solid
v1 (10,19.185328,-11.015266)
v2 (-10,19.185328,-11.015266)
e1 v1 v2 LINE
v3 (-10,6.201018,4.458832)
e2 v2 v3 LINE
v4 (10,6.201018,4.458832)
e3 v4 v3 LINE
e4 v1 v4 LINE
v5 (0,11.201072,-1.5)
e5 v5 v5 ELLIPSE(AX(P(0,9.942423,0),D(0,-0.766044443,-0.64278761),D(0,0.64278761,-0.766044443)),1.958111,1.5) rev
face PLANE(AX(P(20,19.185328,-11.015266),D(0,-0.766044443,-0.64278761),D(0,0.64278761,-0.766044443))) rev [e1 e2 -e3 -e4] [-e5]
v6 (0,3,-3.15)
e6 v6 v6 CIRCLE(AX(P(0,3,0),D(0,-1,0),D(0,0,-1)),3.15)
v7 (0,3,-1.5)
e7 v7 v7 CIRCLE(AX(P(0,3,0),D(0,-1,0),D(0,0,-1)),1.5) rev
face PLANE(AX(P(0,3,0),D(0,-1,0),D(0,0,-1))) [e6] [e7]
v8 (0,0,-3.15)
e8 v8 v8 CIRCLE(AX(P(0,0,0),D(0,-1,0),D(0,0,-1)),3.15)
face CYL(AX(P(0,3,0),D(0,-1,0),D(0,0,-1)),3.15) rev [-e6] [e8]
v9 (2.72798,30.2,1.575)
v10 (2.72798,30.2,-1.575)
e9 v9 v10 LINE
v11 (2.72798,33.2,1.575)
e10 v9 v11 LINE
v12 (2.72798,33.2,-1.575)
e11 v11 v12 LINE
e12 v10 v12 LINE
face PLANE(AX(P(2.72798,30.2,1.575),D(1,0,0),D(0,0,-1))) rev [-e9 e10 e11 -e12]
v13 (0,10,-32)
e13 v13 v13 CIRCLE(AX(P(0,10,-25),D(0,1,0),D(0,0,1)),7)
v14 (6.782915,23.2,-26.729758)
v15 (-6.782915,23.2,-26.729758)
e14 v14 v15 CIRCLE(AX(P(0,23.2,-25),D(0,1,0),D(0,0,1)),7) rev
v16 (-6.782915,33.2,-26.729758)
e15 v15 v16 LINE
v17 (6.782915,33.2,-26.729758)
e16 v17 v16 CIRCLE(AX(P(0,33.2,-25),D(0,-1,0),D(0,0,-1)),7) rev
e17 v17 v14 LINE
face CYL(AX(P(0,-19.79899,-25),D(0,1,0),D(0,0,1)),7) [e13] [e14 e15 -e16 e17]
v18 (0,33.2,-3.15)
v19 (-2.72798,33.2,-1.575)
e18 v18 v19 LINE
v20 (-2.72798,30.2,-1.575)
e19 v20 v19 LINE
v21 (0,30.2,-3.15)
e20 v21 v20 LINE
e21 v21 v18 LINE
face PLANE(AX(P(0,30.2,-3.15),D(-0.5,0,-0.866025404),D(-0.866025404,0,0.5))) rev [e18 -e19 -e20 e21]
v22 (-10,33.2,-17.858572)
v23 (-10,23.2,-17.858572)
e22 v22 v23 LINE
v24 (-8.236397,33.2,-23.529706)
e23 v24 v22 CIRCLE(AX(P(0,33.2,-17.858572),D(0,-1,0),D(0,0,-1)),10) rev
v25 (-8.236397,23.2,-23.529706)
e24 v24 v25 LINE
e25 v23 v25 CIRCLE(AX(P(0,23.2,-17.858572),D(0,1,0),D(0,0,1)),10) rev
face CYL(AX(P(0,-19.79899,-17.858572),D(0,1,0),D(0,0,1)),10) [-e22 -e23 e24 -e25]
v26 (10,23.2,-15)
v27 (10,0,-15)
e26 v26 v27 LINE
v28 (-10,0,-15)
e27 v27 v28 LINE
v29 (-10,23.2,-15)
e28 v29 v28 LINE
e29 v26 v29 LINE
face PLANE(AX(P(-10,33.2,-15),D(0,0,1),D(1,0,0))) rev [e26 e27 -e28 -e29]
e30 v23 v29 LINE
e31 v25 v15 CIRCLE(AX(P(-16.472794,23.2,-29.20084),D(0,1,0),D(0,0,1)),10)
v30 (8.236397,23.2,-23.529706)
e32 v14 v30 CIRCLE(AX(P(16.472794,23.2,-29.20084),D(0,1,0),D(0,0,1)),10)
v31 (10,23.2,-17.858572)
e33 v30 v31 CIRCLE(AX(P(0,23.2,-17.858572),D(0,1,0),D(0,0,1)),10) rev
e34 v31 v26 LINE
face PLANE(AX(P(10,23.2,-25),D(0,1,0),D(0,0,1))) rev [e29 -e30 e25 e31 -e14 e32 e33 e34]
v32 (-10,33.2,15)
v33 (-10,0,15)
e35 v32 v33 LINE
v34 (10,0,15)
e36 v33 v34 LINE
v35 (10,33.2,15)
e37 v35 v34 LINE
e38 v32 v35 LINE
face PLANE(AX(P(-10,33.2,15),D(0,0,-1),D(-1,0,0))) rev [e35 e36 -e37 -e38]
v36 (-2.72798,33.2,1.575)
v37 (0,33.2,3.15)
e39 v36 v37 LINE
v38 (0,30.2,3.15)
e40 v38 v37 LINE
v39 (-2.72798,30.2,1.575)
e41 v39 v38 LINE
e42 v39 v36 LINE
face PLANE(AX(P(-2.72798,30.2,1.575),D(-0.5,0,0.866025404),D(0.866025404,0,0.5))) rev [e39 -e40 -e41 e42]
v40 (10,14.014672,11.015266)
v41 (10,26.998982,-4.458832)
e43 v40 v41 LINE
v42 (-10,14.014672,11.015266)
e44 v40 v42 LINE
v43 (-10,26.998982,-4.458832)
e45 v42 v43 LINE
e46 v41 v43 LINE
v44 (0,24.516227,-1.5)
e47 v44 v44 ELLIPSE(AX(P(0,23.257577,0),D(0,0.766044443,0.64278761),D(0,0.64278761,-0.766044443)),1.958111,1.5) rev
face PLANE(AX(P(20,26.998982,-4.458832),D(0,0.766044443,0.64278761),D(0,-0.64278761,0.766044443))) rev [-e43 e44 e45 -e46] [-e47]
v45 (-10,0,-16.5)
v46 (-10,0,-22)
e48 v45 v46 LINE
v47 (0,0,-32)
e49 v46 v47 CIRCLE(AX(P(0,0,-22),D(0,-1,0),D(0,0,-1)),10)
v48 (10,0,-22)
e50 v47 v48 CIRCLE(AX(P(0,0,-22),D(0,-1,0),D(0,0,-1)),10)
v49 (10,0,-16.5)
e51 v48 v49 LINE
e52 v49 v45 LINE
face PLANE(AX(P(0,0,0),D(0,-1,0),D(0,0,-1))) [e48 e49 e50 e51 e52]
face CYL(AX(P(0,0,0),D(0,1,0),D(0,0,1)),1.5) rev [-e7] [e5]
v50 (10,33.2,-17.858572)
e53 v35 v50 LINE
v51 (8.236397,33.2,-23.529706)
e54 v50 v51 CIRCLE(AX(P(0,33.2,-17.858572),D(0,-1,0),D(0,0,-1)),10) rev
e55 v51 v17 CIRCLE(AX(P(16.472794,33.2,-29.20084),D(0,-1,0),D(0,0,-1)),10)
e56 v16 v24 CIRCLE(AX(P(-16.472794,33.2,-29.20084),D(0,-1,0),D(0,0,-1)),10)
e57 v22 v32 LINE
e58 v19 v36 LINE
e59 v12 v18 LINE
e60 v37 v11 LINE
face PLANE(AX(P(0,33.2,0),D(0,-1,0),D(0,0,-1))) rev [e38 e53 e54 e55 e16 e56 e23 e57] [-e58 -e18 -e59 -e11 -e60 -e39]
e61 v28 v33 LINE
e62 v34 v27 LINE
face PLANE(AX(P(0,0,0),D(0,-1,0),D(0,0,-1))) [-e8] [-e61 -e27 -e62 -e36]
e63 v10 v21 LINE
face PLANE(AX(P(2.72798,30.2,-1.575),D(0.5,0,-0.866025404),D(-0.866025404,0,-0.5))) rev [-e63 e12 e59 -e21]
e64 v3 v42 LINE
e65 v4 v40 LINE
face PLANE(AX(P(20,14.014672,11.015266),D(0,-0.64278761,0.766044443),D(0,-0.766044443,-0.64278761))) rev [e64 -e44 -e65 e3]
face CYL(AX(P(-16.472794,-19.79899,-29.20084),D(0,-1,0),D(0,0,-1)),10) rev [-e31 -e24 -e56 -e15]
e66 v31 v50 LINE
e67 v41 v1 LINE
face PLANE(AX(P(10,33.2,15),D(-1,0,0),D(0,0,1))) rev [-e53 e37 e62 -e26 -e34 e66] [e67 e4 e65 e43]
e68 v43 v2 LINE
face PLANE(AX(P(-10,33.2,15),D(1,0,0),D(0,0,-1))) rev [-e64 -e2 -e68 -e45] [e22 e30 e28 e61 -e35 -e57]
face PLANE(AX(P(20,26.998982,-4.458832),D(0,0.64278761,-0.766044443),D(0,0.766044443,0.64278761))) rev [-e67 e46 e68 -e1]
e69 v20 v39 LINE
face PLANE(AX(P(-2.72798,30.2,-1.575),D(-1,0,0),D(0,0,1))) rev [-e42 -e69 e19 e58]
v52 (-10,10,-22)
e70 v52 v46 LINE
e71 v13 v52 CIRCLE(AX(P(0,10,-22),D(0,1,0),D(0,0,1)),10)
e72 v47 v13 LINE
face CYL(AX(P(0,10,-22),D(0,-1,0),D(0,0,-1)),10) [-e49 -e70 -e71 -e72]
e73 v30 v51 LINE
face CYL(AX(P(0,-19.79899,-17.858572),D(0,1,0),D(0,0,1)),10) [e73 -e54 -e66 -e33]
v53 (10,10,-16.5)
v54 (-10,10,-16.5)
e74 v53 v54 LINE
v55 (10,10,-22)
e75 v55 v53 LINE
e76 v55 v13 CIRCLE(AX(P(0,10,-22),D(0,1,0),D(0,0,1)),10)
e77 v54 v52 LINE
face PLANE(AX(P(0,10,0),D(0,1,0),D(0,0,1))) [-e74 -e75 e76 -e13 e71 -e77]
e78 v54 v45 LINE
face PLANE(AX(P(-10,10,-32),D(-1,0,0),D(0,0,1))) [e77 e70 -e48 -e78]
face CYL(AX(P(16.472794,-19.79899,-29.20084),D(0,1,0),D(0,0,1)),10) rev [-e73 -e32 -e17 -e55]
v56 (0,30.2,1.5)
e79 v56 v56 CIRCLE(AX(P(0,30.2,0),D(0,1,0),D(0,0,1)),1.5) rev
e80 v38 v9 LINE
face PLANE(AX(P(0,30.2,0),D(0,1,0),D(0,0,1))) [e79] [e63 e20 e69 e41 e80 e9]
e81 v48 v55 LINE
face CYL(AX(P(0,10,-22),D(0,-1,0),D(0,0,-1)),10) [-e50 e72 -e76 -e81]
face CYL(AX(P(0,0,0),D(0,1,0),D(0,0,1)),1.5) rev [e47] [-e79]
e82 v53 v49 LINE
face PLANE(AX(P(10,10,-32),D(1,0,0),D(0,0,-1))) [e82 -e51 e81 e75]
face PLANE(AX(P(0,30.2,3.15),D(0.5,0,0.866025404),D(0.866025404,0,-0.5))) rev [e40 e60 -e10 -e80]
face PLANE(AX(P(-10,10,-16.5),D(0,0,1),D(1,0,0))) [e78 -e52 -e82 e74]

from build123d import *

# Parameters (mm, degrees)
SKETCH_1_W                      = 20
SKETCH_1_H                      = 30
EXTRUDE_1_DEPTH                 = 33.2
SKETCH_2_R                      = 1.5
CUT_EXTRUDE_1_DEPTH             = 38.778830051
CUT_EXTRUDE_4_DEPTH             = 30
SKETCH1_W                       = 20
SKETCH1_H                       = 10
BOSS_EXTRUDE2_DEPTH             = 10
BOSS_EXTRUDE3_REACH             = 37.542
SKETCH2_R                       = 7
BOSS_EXTRUDE3_DIRECTION_2_REACH = 37.542
FILLET1_R                       = 10
SKETCH3_W                       = 20
SKETCH3_H                       = 15.5
BOSS_EXTRUDE4_DEPTH             = 10
FILLET2_R                       = 10
SKETCH4_R                       = 3.15
CUT_EXTRUDE1_DEPTH              = 3
CUT_EXTRUDE2_DEPTH              = 3


with BuildPart() as part:
    # Эскиз1 → Бобышка-Вытянуть1 (new body)
    with BuildSketch(Plane(origin=(0, 0, 0), x_dir=(1, 0, 0), z_dir=(0, 1, 0))):
        Rectangle(SKETCH_1_W, SKETCH_1_H)
    extrude(amount=EXTRUDE_1_DEPTH)

    # Эскиз2 → Вырез-Вытянуть1 (cut, through all)
    with BuildSketch(Plane(origin=(0, 33.2, 0), x_dir=(1, 0, 0), z_dir=(0, 1, 0))):
        with Locations(Location((0, 0, 0), (0, 0, 270))):
            Circle(SKETCH_2_R)
    extrude(amount=-CUT_EXTRUDE_1_DEPTH, mode=Mode.SUBTRACT)

    # Эскиз5 → Вырез-Вытянуть4 (cut)
    with BuildSketch(Plane.ZY.offset(10)):
        Polygon((-4.458832066, 26.998981518), (-11.015265685, 19.185328198), (4.458832066, 6.201018482), (11.015265685, 14.014671802), align=None)
    extrude(amount=-CUT_EXTRUDE_4_DEPTH, mode=Mode.SUBTRACT)

    # Sketch1 → Boss-Extrude2 (add)
    with BuildSketch(Plane(origin=(0, 0, -15), x_dir=(-1, 0, 0), z_dir=(0, 0, -1))):
        with Locations((0, 28.2)):
            Rectangle(SKETCH1_W, SKETCH1_H)
    extrude(amount=BOSS_EXTRUDE2_DEPTH)

    # Boss-Extrude3: up to this face of the body (flat: up to its plane)
    boss_extrude3_end = Plane(part.part.faces().sort_by_distance((0, 0, 14.639444872))[0])
    # Sketch2 → Boss-Extrude3 (add, up to the picked face)
    with BuildSketch(Plane.XZ.offset(-23.2), mode=Mode.PRIVATE) as boss_extrude3_sk1:
        with Locations((0, -25)):
            Circle(SKETCH2_R)
    boss_extrude3_tool1 = split(extrude(boss_extrude3_sk1.sketch, amount=BOSS_EXTRUDE3_REACH, mode=Mode.PRIVATE), bisect_by=boss_extrude3_end, keep=Keep.BOTH, mode=Mode.PRIVATE)
    add(boss_extrude3_tool1.solids().sort_by(Axis((0, 23.2, -25), (0, -1, 0)))[0])

    # Boss-Extrude3 direction 2: up to this face of the body (flat: up to its plane)
    boss_extrude3_direction_2_end = Plane(part.part.faces().sort_by_distance((0, 33.2, -5.044572477))[0])
    # Sketch2 → Boss-Extrude3 direction 2 (add, up to the picked face)
    with BuildSketch(Plane.XZ.offset(-23.2), mode=Mode.PRIVATE) as boss_extrude3_direction_2_sk1:
        with Locations((0, -25)):
            Circle(SKETCH2_R)
    boss_extrude3_direction_2_tool1 = split(extrude(boss_extrude3_direction_2_sk1.sketch, amount=-BOSS_EXTRUDE3_DIRECTION_2_REACH, mode=Mode.PRIVATE), bisect_by=boss_extrude3_direction_2_end, keep=Keep.BOTH, mode=Mode.PRIVATE)
    add(boss_extrude3_direction_2_tool1.solids().sort_by(Axis((0, 23.2, -25), (0, 1, 0)))[0])

    # Fillet1
    # the kernel refuses this fillet: 10 mm, written as the material it takes off along each edge
    with BuildSketch(Plane(origin=(-10, 5.346428929, -25), x_dir=(0, 0, 1), z_dir=(0, 1, 0)), Plane(origin=(10, 51.053571071, -25), x_dir=(0, 0, 1), z_dir=(0, -1, 0))) as fillet1_piece_1:
        with BuildLine():
            CenterArc((7.141428429, 10), FILLET1_R, 224.427004001, 45.572995999)
            Line((0, 3), (-0.142828569, 2.86))
            ThreePointArc((-0.142828569, 2.86), (-0.2, 1.5), (-0.2, 0))
            Line((-0.2, 0), (0, -0.2))
            Line((0, -0.2), (7.141428429, -0.2))
            Line((7.141428429, -0.2), (7.141428429, 0))
        make_face()
    extrude(amount=45.707142143, mode=Mode.SUBTRACT)

    # Sketch3 → Boss-Extrude4 (add)
    with BuildSketch(Plane.XZ):
        with Locations((0, -24.25)):
            Rectangle(SKETCH3_W, SKETCH3_H)
    extrude(amount=-BOSS_EXTRUDE4_DEPTH)

    # Fillet2
    # the kernel refuses this fillet: 10 mm, written as the material it adds along each edge
    with BuildSketch(Plane(origin=(7, 23.2, -25), x_dir=(0.6436039974439222, 0, 0.7653586704769234), z_dir=(0, 1, 0))) as fillet2_piece_1:
        with BuildLine():
            CenterArc((2.881578556, 9.953762577), FILLET2_R, 244.245370549, 20.242721963)
            ThreePointArc((-1.463601761, 0.947131242), (-0.702200702, 0.519306771), (0, 0))
            ThreePointArc((0, 0), (0.960526185, 0.046237423), (1.921052371, 0))
        make_face()
    extrude(amount=10)
    with BuildSketch(Plane(origin=(-7, 33.2, -25), x_dir=(0.12452332997196464, 0, -0.9922166801121081), z_dir=(0, -1, 0))) as fillet2_piece_2:
        with BuildLine():
            CenterArc((2.988559919, -9.922166801), FILLET2_R, 97.153229531, 20.242721963)
            ThreePointArc((-1.612810589, -1.043687796), (-0.781284983, -0.560662311), (0, 0))
            ThreePointArc((0, 0), (0.87166331, -0.054483239), (1.74332662, 0))
        make_face()
    extrude(amount=10)
    # the kernel refuses this fillet: 10 mm, written as the material it takes off along each edge
    with BuildSketch(Plane(origin=(10, -25, -32), x_dir=(0, 0, 1), z_dir=(0, 1, 0)), Plane(origin=(-10, -25, -32), x_dir=(1, 0, 0), z_dir=(0, 1, 0))) as fillet2_2_piece_1:
        with BuildLine():
            CenterArc((FILLET2_R, -FILLET2_R), FILLET2_R, 90, 90)
            Line((0, -FILLET2_R), (0, 0))
            Line((0, 0), (FILLET2_R, 0))
        make_face()
    extrude(amount=60, mode=Mode.SUBTRACT)

    # Sketch4 → Cut-Extrude1 (cut)
    with BuildSketch(Plane.XZ):
        with Locations(Location((0, 0, 0), (0, 0, 270))):
            Circle(SKETCH4_R)
    extrude(amount=-CUT_EXTRUDE1_DEPTH, mode=Mode.SUBTRACT)

    # Sketch5 → Cut-Extrude2 (cut)
    with BuildSketch(Plane(origin=(0, 33.2, 0), x_dir=(1, 0, 0), z_dir=(0, 1, 0))):
        Polygon((0, 3.15), (-2.727980022, 1.575), (-2.727980022, -1.575), (0, -3.15), (2.727980022, -1.575), (2.727980022, 1.575), align=None)
    extrude(amount=-CUT_EXTRUDE2_DEPTH, mode=Mode.SUBTRACT)


solid = part.part
